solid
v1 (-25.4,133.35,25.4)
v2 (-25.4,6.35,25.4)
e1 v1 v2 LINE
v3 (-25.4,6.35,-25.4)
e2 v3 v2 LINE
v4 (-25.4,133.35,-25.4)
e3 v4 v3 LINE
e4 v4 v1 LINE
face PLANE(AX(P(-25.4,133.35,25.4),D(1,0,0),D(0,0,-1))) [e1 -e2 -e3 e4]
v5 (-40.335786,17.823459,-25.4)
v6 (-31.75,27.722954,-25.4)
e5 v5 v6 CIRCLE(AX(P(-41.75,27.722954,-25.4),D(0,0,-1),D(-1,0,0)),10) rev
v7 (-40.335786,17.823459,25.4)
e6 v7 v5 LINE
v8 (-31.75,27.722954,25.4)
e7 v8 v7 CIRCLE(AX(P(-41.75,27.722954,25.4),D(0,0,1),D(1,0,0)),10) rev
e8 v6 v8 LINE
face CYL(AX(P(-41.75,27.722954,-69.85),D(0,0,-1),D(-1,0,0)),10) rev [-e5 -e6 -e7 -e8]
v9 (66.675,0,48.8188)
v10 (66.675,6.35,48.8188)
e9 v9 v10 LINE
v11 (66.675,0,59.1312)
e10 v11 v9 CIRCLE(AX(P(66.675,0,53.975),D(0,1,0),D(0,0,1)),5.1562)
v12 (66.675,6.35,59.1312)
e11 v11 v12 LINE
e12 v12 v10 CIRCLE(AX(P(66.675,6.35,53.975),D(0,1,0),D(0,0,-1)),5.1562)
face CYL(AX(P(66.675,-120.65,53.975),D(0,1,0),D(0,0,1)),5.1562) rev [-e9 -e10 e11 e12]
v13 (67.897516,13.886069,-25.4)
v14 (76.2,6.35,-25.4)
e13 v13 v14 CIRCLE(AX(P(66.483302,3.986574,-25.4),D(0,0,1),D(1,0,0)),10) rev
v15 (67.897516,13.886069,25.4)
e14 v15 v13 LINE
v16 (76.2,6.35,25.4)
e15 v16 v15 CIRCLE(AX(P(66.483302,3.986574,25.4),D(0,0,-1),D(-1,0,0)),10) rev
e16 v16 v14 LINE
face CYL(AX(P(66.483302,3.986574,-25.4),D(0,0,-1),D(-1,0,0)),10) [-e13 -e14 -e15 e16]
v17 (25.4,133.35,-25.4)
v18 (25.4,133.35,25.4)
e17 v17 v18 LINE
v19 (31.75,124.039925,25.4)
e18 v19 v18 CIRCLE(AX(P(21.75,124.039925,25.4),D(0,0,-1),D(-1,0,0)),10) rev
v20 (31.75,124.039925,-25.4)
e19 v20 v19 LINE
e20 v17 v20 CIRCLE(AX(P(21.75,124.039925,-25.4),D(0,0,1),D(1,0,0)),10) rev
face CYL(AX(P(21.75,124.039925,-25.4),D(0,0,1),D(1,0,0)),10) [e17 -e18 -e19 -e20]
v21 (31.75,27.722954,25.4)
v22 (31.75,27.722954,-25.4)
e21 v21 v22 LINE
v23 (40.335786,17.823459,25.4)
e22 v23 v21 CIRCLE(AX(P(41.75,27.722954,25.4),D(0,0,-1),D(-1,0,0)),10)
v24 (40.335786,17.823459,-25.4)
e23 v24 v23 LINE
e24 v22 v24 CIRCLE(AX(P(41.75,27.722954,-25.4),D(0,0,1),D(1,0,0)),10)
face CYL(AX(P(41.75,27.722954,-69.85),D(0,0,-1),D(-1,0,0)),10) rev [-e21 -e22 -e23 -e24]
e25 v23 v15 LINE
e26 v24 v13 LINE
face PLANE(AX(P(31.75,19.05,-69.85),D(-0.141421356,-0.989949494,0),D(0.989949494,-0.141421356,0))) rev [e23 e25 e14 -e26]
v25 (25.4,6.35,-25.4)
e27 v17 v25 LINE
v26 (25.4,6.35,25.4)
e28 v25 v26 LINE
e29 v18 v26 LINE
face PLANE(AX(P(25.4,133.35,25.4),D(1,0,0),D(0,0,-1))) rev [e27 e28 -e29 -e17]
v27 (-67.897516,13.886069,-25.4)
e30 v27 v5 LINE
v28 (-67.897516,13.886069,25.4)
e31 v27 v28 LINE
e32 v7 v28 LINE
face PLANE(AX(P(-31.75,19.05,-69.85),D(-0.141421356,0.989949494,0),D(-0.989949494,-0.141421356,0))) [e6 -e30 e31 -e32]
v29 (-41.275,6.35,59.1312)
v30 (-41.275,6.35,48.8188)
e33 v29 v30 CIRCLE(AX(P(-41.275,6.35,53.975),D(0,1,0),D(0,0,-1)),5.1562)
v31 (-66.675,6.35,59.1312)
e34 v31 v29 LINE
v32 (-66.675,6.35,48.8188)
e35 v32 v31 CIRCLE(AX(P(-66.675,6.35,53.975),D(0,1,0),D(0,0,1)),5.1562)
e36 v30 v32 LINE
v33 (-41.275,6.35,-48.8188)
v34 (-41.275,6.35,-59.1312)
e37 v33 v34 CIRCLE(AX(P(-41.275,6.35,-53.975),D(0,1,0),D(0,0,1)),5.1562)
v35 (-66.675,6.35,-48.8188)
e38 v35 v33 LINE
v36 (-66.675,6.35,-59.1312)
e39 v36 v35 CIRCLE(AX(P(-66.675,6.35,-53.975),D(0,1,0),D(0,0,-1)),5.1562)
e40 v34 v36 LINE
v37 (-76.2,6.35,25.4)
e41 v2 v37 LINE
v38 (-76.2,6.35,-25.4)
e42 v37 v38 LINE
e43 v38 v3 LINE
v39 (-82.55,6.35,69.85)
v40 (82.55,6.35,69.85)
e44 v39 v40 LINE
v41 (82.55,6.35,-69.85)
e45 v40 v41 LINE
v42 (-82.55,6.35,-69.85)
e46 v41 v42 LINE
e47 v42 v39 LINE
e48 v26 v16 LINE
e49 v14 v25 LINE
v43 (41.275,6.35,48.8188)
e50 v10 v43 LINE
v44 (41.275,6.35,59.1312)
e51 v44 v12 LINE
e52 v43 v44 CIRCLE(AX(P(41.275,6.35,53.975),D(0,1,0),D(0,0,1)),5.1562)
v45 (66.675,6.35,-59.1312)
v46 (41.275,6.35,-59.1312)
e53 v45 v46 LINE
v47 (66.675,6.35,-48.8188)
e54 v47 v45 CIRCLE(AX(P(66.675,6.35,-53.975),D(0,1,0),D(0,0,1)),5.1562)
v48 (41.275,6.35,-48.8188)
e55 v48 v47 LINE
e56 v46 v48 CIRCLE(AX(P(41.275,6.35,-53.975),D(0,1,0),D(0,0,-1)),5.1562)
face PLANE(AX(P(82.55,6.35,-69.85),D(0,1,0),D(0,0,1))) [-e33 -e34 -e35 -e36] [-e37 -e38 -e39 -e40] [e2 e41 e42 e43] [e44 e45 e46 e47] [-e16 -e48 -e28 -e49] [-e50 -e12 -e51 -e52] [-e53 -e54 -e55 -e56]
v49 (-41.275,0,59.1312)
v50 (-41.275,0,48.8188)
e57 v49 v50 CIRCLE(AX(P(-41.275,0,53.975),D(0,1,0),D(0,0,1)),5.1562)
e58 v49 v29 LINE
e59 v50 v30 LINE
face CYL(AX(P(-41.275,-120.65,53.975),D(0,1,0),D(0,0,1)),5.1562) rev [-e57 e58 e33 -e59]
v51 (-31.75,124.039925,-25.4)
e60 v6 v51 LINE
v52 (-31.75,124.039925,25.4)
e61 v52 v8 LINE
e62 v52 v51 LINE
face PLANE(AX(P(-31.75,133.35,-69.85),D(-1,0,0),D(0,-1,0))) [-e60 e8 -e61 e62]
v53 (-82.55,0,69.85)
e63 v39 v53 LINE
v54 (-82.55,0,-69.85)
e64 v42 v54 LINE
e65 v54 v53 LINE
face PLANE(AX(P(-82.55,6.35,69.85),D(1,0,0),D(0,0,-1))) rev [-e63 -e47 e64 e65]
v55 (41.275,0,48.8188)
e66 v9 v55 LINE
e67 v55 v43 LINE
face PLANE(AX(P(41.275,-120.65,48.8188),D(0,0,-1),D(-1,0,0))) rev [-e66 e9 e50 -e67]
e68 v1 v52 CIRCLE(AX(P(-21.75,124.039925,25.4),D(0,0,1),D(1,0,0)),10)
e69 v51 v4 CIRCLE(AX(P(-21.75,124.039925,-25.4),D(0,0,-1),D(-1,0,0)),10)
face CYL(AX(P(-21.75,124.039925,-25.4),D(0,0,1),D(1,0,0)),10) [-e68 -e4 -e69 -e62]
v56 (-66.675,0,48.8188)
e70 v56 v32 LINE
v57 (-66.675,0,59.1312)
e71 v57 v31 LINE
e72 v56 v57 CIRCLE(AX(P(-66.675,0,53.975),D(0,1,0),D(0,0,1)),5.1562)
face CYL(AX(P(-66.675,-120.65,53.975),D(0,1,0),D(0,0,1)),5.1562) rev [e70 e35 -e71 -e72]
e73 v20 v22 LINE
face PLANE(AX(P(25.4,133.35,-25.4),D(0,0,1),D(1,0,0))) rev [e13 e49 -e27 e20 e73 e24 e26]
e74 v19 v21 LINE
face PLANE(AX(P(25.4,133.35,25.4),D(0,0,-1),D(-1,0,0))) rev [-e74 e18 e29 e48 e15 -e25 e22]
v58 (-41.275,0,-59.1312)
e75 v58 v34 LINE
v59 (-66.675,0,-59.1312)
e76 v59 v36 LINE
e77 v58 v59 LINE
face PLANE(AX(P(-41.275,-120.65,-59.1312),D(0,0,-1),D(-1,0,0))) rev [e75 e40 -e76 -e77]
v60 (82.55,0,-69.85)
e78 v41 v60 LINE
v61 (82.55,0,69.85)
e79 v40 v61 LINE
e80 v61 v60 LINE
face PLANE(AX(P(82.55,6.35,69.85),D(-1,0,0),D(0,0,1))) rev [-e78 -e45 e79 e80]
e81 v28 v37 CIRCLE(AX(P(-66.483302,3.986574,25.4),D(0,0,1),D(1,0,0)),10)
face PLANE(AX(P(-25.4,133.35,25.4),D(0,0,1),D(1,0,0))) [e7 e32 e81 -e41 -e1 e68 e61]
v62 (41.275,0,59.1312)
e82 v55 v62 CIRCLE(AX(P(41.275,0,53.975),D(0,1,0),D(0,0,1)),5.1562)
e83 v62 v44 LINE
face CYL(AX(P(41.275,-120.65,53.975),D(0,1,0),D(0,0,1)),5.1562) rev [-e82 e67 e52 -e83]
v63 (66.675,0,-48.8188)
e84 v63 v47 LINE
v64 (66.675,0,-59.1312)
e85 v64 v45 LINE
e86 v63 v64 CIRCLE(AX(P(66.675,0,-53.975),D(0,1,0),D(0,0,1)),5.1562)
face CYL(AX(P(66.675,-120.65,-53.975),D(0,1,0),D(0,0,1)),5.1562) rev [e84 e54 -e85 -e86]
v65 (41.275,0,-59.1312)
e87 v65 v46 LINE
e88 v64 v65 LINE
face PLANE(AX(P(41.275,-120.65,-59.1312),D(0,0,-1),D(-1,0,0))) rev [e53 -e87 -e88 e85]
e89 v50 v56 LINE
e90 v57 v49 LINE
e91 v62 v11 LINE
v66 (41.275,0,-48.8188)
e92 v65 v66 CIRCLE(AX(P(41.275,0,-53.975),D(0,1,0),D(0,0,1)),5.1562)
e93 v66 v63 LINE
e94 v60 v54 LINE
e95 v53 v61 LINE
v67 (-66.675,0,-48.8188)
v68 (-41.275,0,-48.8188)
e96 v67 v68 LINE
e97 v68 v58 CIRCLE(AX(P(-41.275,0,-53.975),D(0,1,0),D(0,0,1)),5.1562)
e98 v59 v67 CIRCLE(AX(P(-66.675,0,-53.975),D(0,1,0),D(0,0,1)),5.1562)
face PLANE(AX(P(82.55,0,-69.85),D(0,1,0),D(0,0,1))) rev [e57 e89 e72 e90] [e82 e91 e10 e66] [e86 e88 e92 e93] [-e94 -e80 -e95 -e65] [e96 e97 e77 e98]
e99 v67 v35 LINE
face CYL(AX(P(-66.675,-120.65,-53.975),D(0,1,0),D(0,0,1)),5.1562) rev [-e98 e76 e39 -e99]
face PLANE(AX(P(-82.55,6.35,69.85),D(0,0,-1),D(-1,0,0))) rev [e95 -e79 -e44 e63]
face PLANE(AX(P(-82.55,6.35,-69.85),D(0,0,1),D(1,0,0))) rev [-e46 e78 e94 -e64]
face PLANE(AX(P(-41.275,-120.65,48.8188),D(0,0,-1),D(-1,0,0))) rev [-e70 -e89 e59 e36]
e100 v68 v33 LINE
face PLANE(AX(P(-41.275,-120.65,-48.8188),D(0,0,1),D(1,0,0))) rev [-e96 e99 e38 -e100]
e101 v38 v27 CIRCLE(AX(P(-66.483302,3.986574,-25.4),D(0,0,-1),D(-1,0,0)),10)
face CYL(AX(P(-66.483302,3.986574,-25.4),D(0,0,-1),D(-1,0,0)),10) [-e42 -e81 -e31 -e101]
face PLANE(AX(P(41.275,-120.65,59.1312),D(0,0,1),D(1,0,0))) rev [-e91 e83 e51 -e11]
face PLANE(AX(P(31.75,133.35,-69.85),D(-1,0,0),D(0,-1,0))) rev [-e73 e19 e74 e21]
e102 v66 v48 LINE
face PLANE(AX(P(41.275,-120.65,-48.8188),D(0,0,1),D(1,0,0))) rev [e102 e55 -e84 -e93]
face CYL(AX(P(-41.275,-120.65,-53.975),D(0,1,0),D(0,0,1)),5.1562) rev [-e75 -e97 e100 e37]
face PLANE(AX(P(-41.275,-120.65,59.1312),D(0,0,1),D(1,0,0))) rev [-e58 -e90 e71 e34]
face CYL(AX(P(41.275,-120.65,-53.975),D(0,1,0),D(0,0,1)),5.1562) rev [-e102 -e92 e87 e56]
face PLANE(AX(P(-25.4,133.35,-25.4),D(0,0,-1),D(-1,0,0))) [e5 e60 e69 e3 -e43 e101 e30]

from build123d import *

# Parameters (mm, degrees)
SKETCH1_W           = 165.1
SKETCH1_H           = 139.7
BOSS_EXTRUDE1_DEPTH = 6.35
SKETCH2_W           = 50.8
SKETCH2_H           = 50.8
BOSS_EXTRUDE2_DEPTH = 127
CUT_EXTRUDE1_DEPTH  = 184.491927615
FILLET1_R           = 10
MIRROR6_START       = -25.4
MIRROR6_DEPTH       = 50.8
CUT_EXTRUDE2_DEPTH  = 127


with BuildPart() as part:
    # Sketch1 → Boss-Extrude1 (new body)
    with BuildSketch(Plane(origin=(0, 0, 0), x_dir=(1, 0, 0), z_dir=(0, 1, 0))):
        Rectangle(SKETCH1_W, SKETCH1_H)
    extrude(amount=BOSS_EXTRUDE1_DEPTH)

    # Sketch2 → Boss-Extrude2 (add)
    with BuildSketch(Plane(origin=(0, 6.35, 0), x_dir=(1, 0, 0), z_dir=(0, 1, 0))):
        with Locations((50.8, 0)):
            Rectangle(SKETCH2_W, SKETCH2_H)
    extrude(amount=BOSS_EXTRUDE2_DEPTH)

    # Sketch4 → Cut-Extrude1 (cut, through all)
    with BuildSketch(Plane.XY.offset(25.4)):
        Polygon((31.75, 133.35), (31.75, 19.05), (76.2, 12.7), (95.954687833, 12.7), (95.954687833, 161.138699607), (31.75, 161.138699607), align=None)
    extrude(amount=-CUT_EXTRUDE1_DEPTH, mode=Mode.SUBTRACT)

    # Fillet1
    # the kernel refuses this fillet: 10 mm, written as the material it adds along each edge
    with BuildSketch(Plane(origin=(31.75, 19.05, 25.4), x_dir=(0.9899494936611666, -0.14142135623730998, 0), z_dir=(0, 0, -1))) as fillet1_piece_1:
        with BuildLine():
            CenterArc((FILLET1_R * 0.867295401695, -FILLET1_R), FILLET1_R, 90, 81.869897646)
            Line((-FILLET1_R * 0.122654091966, -FILLET1_R * 0.858578643763), (0, 0))
            Line((0, 0), (FILLET1_R * 0.867295401695, 0))
        make_face()
    extrude(amount=50.8)
    # the kernel refuses this fillet: 10 mm, written as the material it takes off along each edge
    with BuildSketch(Plane(origin=(76.2, 12.7, 46.366939289), x_dir=(0, -1, 0), z_dir=(0, 0, -1))) as fillet1_2_piece_1:
        with BuildLine():
            CenterArc((8.71342574, 9.716697935), FILLET1_R, 188.130102354, 68.199121512)
            Line((-1.186069196, 8.302484373), (0, 0))
            Line((0, 0), (6.35, 0))
        make_face()
    extrude(amount=92.733878578, mode=Mode.SUBTRACT)
    with BuildSketch(Plane(origin=(31.75, 133.35, 48.675187969), x_dir=(-1, 0, 0), z_dir=(0, 0, -1))) as fillet1_2_piece_2:
        with BuildLine():
            CenterArc((10, -9.310075188), FILLET1_R, 111.407582704, 68.592417296)
            Line((0, -9.310075188), (0, 0))
            Line((0, 0), (6.35, 0))
        make_face()
    extrude(amount=97.350375938, mode=Mode.SUBTRACT)

    # Mirror6: read off the stored shape, not the designer's step
    # Mirror6 outline → Mirror6 (add)
    with BuildSketch(Plane.XY.offset(MIRROR6_START)):
        with BuildLine():
            Line((-76.2, 6.35), (-25.4, 6.35))
            Line((-25.4, 6.35), (-25.4, 133.35))
            ThreePointArc((-25.4, 133.35), (-30.011355821, 129.674638647), (-31.75, 124.039924812))
            Line((-31.75, 124.039924812), (-31.75, 27.722954017))
            ThreePointArc((-31.75, 27.722954017), (-34.19546045, 21.170936603), (-40.335786438, 17.82345908))
            Line((-40.335786438, 17.82345908), (-67.897515627, 13.886069196))
            ThreePointArc((-67.897515627, 13.886069196), (-73.204342343, 11.391141605), (-76.2, 6.35))
        make_face()
    extrude(amount=MIRROR6_DEPTH)

    # Sketch6 → Cut-Extrude2 (cut)
    with BuildSketch(Plane(origin=(0, 6.35, 0), x_dir=(-1, 0, 0), z_dir=(0, 1, 0))):
        with BuildLine():
            Line((-41.275, 48.8188), (-66.675, 48.8188))
            ThreePointArc((-66.675, 48.8188), (-71.8312, 53.975), (-66.675, 59.1312))
            Line((-66.675, 59.1312), (-41.275, 59.1312))
            ThreePointArc((-41.275, 59.1312), (-36.1188, 53.975), (-41.275, 48.8188))
        make_face()
        with BuildLine():
            Line((-41.275, -59.1312), (-66.675, -59.1312))
            ThreePointArc((-66.675, -59.1312), (-71.8312, -53.975), (-66.675, -48.8188))
            Line((-66.675, -48.8188), (-41.275, -48.8188))
            ThreePointArc((-41.275, -48.8188), (-36.1188, -53.975), (-41.275, -59.1312))
        make_face()
        with BuildLine():
            Line((41.275, 59.1312), (66.675, 59.1312))
            ThreePointArc((66.675, 59.1312), (71.8312, 53.975), (66.675, 48.8188))
            Line((66.675, 48.8188), (41.275, 48.8188))
            ThreePointArc((41.275, 48.8188), (36.1188, 53.975), (41.275, 59.1312))
        make_face()
        with BuildLine():
            Line((41.275, -48.8188), (66.675, -48.8188))
            ThreePointArc((66.675, -48.8188), (71.8312, -53.975), (66.675, -59.1312))
            Line((66.675, -59.1312), (41.275, -59.1312))
            ThreePointArc((41.275, -59.1312), (36.1188, -53.975), (41.275, -48.8188))
        make_face()
    extrude(amount=-CUT_EXTRUDE2_DEPTH, mode=Mode.SUBTRACT)


solid = part.part
